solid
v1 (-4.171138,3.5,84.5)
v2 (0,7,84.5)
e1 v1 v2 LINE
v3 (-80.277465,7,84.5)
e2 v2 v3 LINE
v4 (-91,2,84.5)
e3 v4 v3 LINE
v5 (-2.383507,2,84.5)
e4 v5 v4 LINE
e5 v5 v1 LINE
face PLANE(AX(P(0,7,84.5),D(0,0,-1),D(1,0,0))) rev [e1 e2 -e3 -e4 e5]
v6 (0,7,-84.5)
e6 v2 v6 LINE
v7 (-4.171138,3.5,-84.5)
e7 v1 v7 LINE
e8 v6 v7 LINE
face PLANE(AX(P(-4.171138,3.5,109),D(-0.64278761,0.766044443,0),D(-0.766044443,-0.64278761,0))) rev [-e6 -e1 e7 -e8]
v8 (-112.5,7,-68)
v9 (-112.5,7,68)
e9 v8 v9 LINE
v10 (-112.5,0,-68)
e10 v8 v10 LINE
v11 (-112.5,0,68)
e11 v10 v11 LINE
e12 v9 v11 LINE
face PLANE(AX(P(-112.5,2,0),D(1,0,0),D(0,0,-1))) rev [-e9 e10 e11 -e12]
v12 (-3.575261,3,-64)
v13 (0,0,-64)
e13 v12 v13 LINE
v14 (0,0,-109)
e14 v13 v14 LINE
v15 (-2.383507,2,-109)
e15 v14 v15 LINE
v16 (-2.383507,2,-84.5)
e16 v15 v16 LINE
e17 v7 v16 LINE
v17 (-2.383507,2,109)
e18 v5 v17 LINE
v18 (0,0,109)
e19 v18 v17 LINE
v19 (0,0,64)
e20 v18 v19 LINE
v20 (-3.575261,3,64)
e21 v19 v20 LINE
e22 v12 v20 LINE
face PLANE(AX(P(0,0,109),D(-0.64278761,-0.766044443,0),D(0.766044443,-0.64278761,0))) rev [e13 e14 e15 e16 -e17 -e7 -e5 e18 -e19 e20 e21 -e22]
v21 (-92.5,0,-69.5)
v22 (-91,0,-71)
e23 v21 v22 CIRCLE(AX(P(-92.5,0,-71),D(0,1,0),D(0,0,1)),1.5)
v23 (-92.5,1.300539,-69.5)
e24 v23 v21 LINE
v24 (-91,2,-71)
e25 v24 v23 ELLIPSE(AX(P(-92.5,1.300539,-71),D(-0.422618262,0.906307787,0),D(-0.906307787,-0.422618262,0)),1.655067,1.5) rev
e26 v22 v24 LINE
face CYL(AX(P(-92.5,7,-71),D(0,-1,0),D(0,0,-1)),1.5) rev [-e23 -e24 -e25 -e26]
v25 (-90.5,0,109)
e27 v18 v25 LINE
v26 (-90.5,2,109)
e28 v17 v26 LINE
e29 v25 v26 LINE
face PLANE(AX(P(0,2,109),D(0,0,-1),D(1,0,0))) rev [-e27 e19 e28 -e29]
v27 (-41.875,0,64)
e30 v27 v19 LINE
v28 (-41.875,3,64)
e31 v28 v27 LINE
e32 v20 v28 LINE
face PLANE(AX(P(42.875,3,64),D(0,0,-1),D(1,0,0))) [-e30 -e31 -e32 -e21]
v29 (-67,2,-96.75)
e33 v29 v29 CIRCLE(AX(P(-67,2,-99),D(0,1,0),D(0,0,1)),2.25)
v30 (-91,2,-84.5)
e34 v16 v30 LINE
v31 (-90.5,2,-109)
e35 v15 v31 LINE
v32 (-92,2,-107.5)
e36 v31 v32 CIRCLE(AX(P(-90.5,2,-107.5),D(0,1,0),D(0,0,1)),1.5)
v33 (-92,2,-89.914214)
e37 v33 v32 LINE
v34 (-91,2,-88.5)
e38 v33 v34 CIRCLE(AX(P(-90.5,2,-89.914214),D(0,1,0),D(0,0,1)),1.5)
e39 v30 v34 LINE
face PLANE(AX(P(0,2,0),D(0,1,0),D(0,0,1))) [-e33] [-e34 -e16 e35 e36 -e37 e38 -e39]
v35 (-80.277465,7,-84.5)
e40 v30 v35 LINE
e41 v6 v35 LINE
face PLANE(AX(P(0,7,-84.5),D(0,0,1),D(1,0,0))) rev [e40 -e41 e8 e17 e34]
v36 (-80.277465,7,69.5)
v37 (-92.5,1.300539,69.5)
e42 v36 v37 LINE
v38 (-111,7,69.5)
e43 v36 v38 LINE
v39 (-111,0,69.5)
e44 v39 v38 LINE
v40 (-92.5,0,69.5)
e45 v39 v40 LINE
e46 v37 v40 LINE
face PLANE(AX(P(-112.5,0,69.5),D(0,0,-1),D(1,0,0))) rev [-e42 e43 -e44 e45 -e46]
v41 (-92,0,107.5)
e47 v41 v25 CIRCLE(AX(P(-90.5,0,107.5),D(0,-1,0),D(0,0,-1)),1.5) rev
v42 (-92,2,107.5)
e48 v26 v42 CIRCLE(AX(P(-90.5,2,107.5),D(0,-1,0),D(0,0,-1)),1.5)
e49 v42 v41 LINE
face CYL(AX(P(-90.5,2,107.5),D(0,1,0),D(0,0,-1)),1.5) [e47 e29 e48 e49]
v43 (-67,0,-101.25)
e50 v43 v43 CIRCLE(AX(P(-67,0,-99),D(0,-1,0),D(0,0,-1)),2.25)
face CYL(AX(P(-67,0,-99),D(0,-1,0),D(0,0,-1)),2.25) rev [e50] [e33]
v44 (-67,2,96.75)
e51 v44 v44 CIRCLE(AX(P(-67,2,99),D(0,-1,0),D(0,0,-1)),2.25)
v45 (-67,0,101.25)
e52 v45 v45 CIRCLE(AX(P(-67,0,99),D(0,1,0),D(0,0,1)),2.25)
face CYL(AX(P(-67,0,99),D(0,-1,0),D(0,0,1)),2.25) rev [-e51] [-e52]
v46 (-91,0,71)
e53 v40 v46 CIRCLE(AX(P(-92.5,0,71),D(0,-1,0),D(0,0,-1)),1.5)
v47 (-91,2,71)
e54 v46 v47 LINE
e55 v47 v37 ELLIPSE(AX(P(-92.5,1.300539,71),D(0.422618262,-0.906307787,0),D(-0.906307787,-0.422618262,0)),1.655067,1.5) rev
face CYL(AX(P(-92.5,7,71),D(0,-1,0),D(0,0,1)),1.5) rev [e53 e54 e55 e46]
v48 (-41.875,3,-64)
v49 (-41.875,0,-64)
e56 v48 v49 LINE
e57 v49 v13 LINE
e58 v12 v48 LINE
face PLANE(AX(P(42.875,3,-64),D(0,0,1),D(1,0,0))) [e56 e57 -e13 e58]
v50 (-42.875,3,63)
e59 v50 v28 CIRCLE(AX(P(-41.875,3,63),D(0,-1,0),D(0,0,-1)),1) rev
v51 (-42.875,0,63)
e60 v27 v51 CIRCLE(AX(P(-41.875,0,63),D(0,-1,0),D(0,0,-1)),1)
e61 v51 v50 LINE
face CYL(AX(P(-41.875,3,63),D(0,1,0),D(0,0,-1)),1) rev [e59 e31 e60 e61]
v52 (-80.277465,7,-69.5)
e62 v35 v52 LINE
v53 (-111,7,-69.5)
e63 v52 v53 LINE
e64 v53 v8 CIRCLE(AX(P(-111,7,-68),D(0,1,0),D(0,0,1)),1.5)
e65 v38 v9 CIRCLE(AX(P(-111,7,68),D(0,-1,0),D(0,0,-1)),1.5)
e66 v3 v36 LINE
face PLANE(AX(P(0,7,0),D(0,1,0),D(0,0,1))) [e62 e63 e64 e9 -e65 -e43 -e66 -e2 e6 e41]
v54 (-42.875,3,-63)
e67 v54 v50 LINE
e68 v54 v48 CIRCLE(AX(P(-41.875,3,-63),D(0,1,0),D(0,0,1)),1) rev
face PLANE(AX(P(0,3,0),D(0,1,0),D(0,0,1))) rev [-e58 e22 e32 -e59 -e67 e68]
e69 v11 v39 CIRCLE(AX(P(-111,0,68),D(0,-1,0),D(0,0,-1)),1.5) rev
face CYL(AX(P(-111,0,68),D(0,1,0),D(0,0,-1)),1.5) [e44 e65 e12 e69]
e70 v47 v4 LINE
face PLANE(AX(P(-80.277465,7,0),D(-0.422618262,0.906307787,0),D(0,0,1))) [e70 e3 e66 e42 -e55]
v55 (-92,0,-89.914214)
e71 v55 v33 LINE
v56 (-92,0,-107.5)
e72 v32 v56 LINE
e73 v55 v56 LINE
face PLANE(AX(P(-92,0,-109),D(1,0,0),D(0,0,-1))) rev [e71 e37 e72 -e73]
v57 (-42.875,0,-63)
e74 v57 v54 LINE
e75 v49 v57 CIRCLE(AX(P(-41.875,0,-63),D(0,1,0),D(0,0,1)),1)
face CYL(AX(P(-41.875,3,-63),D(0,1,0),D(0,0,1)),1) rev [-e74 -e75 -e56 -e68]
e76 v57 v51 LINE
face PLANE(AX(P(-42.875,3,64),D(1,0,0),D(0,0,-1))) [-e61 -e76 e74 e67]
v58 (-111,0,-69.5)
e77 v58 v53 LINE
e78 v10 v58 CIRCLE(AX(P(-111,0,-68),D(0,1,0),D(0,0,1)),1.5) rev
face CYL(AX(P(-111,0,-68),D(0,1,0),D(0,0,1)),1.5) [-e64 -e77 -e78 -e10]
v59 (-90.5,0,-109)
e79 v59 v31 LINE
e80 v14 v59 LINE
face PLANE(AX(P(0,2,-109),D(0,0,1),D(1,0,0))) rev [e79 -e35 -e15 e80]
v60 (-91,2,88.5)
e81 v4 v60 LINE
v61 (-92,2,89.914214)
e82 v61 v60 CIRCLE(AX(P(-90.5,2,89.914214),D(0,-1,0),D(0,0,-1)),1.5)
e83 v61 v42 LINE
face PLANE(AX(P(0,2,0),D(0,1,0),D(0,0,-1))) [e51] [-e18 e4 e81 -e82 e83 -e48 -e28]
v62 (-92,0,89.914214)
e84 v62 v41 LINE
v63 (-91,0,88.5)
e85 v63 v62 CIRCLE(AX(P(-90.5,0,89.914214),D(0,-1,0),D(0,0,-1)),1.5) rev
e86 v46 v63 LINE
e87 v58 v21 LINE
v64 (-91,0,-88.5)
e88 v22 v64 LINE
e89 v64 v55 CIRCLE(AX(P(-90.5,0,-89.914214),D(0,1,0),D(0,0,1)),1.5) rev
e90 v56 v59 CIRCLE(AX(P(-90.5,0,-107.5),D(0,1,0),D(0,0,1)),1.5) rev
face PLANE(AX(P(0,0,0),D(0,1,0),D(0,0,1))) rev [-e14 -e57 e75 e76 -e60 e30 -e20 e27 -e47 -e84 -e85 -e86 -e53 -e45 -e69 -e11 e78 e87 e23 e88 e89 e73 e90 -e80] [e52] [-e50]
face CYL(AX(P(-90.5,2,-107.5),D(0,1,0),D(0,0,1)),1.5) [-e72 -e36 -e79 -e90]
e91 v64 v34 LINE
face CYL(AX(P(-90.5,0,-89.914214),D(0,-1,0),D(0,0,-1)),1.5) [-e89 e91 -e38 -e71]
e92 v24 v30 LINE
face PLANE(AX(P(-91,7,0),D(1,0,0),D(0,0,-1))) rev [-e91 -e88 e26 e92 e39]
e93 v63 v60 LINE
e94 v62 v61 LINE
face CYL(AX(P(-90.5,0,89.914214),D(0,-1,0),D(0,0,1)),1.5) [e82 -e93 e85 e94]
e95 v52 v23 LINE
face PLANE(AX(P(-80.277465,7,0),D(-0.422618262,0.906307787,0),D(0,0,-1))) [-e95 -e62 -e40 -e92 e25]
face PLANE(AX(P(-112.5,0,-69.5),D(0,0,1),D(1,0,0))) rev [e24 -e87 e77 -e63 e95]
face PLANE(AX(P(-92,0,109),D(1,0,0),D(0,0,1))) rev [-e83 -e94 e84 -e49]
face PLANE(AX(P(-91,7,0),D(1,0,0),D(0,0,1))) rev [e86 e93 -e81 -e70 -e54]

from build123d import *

# Parameters (mm, degrees)
SKIZZE2_W                       = 112.5
SKIZZE2_H                       = 109
AUFSATZ_LINEAR_AUSTRAGEN1_DEPTH = 2
SKIZZE3_W                       = 20.5
SKIZZE3_H                       = 20.5
SCHNITT_LINEAR_AUSTRAGEN1_DEPTH = 157.656471299
SKIZZE5_W                       = 91
SKIZZE5_H                       = 84.5
AUFSATZ_LINEAR_AUSTRAGEN2_DEPTH = 5
SKIZZE8_W                       = 21.5
SKIZZE8_H                       = 19
SCHNITT_LINEAR_AUSTRAGEN3_DEPTH = 157.723482606
SKIZZE9_W                       = 21.5
SKIZZE9_H                       = 69.5
AUFSATZ_LINEAR_AUSTRAGEN3_DEPTH = 5
FASE1_SIZE                      = 5
FASE1_SIZE2                     = 10.722534603
SKIZZE10_W                      = 85.75
SKIZZE10_H                      = 128
SCHNITT_LINEAR_AUSTRAGEN4_DEPTH = 3
VERRUNDUNG1_R                   = 1
DURCHGANGSLOCH_F_R_M41_D        = 4.5
DURCHGANGSLOCH_F_R_M41_DEPTH    = 6
VERRUNDUNG2_R                   = 1.5
SCHNITT_LINEAR_AUSTRAGEN7_DEPTH = 246.416482739


with BuildPart() as part:
    # Skizze2 → Aufsatz-Linear austragen1 (new body)
    with BuildSketch(Plane(origin=(0, 0, 0), x_dir=(1, 0, 0), z_dir=(0, 1, 0))):
        with Locations((-56.25, 54.5)):
            Rectangle(SKIZZE2_W, SKIZZE2_H)
    extrude(amount=AUFSATZ_LINEAR_AUSTRAGEN1_DEPTH)

    # Skizze3 → Schnitt-Linear austragen1 (cut, through all)
    with BuildSketch(Plane(origin=(0, 2, 0), x_dir=(1, 0, 0), z_dir=(0, 1, 0))):
        with Locations((-102.25, 98.75)):
            Rectangle(SKIZZE3_W, SKIZZE3_H)
    extrude(amount=-SCHNITT_LINEAR_AUSTRAGEN1_DEPTH, mode=Mode.SUBTRACT)

    # Skizze5 → Aufsatz-Linear austragen2 (add)
    with BuildSketch(Plane(origin=(0, 2, 0), x_dir=(1, 0, 0), z_dir=(0, 1, 0))):
        with Locations((-45.5, 42.25)):
            Rectangle(SKIZZE5_W, SKIZZE5_H)
    extrude(amount=AUFSATZ_LINEAR_AUSTRAGEN2_DEPTH)

    # Skizze8 → Schnitt-Linear austragen3 (cut, through all)
    with BuildSketch(Plane(origin=(0, 2, 0), x_dir=(1, 0, 0), z_dir=(0, 1, 0))):
        with Locations((-101.75, 79)):
            Rectangle(SKIZZE8_W, SKIZZE8_H)
    extrude(amount=-SCHNITT_LINEAR_AUSTRAGEN3_DEPTH, mode=Mode.SUBTRACT)

    # Skizze9 → Aufsatz-Linear austragen3 (add)
    with BuildSketch(Plane(origin=(0, 2, 0), x_dir=(1, 0, 0), z_dir=(0, 1, 0))):
        with Locations((-101.75, 34.75)):
            Rectangle(SKIZZE9_W, SKIZZE9_H)
    extrude(amount=AUFSATZ_LINEAR_AUSTRAGEN3_DEPTH)

    # Fase1
    fase1_edges = [part.edges().sort_by_distance(p)[0] for p in [
        (-91, 7, -77),
    ]]
    fase1_side = [part.faces().sort_by_distance(p)[0] for p in [
        (-91, 3.32300885, -77.672566372),
    ]]
    chamfer(fase1_edges, length=FASE1_SIZE, length2=FASE1_SIZE2, reference=fase1_side[0])

    # Skizze10 → Schnitt-Linear austragen4 (cut)
    with BuildSketch(Plane(origin=(0, 0, 0), x_dir=(1, 0, 0), z_dir=(0, 1, 0))):
        Rectangle(SKIZZE10_W, SKIZZE10_H)
    extrude(amount=SCHNITT_LINEAR_AUSTRAGEN4_DEPTH, mode=Mode.SUBTRACT)

    # Verrundung1
    verrundung1_edges = [part.edges().sort_by_distance(p)[0] for p in [
        (-42.875, 1.5, -64),
    ]]
    fillet(verrundung1_edges, radius=VERRUNDUNG1_R)

    # Durchgangsloch für M41
    with Locations(Plane(origin=(0, 0, 0), x_dir=(-1, 0, 0), z_dir=(0, -1, 0))):
        with Locations((67, 99)):
            Hole(DURCHGANGSLOCH_F_R_M41_D / 2, depth=DURCHGANGSLOCH_F_R_M41_DEPTH)

    # Verrundung2
    # the kernel refuses this fillet: 1.5 mm, written as the material it adds along each edge
    with BuildSketch(Plane(origin=(-91, 0, -69.5), x_dir=(-1, 0, 0), z_dir=(0, 1, 0))) as verrundung2_piece_1_section:
        with BuildLine():
            CenterArc((VERRUNDUNG2_R, -VERRUNDUNG2_R), VERRUNDUNG2_R, 90, 90)
            Line((0, -VERRUNDUNG2_R), (0, 0))
            Line((0, 0), (VERRUNDUNG2_R, 0))
        make_face()
    verrundung2_piece_1 = extrude(amount=5.75, mode=Mode.PRIVATE)
    verrundung2_piece_1 = split(verrundung2_piece_1, bisect_by=Plane(origin=(-91.766044443, 1.64278761, -69.5), z_dir=(0.4226182617406971, -0.906307787036651, 0)), keep=Keep.TOP, mode=Mode.PRIVATE)
    add(verrundung2_piece_1)
    # the kernel refuses this fillet: 1.5 mm, written as the material it takes off along each edge
    with BuildSketch(Plane(origin=(-92, 5.535533906, -88.5), x_dir=(0, 0, -1), z_dir=(0, -1, 0))) as verrundung2_2_piece_1:
        with BuildLine():
            CenterArc((1.414213562, 1.5), VERRUNDUNG2_R, 199.471220634, 70.528779366)
            Line((0, 1), (0, 0))
            Line((0, 0), (1.414213562, 0))
        make_face()
    extrude(amount=9.071067812, mode=Mode.SUBTRACT)
    with BuildSketch(Plane(origin=(-112.5, 10.75, -69.5), x_dir=(1, 0, 0), z_dir=(0, -1, 0))) as verrundung2_2_piece_2:
        with BuildLine():
            CenterArc((VERRUNDUNG2_R, VERRUNDUNG2_R), VERRUNDUNG2_R, 180, 90)
            Line((0, VERRUNDUNG2_R), (0, 0))
            Line((0, 0), (VERRUNDUNG2_R, 0))
        make_face()
    extrude(amount=14.5, mode=Mode.SUBTRACT)
    with BuildSketch(Plane(origin=(-92, 5.75, -109), x_dir=(1, 0, 0), z_dir=(0, -1, 0))) as verrundung2_2_piece_3:
        with BuildLine():
            CenterArc((VERRUNDUNG2_R, VERRUNDUNG2_R), VERRUNDUNG2_R, 180, 90)
            Line((0, VERRUNDUNG2_R), (0, 0))
            Line((0, 0), (VERRUNDUNG2_R, 0))
        make_face()
    extrude(amount=9.5, mode=Mode.SUBTRACT)

    # Spiegeln1: part across face


with BuildPart() as part_1:
    add(part.part)
    add(part.part.mirror(Plane(origin=(-63.046065737, 3.890438247, 0), x_dir=(1, 0, 0), z_dir=(0, 0, 1))))

    # Spiegeln2: part across plane


with BuildPart() as part_2:
    add(part_1.part)
    add(part_1.part.mirror(Plane(origin=(0, 2, 0), x_dir=(0, 0, 1), z_dir=(-1, 0, 0))))

    # Skizze15 → Schnitt-Linear austragen7 (cut, through all)
    with BuildSketch(Plane(origin=(0, 0, -109), x_dir=(-1, 0, 0), z_dir=(0, 0, -1))):
        Polygon((0, 0), (4.171137574, 3.5), (0, 7), (-112.5, 7), (-112.5, 0), align=None)
    extrude(amount=-SCHNITT_LINEAR_AUSTRAGEN7_DEPTH, mode=Mode.SUBTRACT)


solid = part_2.part
